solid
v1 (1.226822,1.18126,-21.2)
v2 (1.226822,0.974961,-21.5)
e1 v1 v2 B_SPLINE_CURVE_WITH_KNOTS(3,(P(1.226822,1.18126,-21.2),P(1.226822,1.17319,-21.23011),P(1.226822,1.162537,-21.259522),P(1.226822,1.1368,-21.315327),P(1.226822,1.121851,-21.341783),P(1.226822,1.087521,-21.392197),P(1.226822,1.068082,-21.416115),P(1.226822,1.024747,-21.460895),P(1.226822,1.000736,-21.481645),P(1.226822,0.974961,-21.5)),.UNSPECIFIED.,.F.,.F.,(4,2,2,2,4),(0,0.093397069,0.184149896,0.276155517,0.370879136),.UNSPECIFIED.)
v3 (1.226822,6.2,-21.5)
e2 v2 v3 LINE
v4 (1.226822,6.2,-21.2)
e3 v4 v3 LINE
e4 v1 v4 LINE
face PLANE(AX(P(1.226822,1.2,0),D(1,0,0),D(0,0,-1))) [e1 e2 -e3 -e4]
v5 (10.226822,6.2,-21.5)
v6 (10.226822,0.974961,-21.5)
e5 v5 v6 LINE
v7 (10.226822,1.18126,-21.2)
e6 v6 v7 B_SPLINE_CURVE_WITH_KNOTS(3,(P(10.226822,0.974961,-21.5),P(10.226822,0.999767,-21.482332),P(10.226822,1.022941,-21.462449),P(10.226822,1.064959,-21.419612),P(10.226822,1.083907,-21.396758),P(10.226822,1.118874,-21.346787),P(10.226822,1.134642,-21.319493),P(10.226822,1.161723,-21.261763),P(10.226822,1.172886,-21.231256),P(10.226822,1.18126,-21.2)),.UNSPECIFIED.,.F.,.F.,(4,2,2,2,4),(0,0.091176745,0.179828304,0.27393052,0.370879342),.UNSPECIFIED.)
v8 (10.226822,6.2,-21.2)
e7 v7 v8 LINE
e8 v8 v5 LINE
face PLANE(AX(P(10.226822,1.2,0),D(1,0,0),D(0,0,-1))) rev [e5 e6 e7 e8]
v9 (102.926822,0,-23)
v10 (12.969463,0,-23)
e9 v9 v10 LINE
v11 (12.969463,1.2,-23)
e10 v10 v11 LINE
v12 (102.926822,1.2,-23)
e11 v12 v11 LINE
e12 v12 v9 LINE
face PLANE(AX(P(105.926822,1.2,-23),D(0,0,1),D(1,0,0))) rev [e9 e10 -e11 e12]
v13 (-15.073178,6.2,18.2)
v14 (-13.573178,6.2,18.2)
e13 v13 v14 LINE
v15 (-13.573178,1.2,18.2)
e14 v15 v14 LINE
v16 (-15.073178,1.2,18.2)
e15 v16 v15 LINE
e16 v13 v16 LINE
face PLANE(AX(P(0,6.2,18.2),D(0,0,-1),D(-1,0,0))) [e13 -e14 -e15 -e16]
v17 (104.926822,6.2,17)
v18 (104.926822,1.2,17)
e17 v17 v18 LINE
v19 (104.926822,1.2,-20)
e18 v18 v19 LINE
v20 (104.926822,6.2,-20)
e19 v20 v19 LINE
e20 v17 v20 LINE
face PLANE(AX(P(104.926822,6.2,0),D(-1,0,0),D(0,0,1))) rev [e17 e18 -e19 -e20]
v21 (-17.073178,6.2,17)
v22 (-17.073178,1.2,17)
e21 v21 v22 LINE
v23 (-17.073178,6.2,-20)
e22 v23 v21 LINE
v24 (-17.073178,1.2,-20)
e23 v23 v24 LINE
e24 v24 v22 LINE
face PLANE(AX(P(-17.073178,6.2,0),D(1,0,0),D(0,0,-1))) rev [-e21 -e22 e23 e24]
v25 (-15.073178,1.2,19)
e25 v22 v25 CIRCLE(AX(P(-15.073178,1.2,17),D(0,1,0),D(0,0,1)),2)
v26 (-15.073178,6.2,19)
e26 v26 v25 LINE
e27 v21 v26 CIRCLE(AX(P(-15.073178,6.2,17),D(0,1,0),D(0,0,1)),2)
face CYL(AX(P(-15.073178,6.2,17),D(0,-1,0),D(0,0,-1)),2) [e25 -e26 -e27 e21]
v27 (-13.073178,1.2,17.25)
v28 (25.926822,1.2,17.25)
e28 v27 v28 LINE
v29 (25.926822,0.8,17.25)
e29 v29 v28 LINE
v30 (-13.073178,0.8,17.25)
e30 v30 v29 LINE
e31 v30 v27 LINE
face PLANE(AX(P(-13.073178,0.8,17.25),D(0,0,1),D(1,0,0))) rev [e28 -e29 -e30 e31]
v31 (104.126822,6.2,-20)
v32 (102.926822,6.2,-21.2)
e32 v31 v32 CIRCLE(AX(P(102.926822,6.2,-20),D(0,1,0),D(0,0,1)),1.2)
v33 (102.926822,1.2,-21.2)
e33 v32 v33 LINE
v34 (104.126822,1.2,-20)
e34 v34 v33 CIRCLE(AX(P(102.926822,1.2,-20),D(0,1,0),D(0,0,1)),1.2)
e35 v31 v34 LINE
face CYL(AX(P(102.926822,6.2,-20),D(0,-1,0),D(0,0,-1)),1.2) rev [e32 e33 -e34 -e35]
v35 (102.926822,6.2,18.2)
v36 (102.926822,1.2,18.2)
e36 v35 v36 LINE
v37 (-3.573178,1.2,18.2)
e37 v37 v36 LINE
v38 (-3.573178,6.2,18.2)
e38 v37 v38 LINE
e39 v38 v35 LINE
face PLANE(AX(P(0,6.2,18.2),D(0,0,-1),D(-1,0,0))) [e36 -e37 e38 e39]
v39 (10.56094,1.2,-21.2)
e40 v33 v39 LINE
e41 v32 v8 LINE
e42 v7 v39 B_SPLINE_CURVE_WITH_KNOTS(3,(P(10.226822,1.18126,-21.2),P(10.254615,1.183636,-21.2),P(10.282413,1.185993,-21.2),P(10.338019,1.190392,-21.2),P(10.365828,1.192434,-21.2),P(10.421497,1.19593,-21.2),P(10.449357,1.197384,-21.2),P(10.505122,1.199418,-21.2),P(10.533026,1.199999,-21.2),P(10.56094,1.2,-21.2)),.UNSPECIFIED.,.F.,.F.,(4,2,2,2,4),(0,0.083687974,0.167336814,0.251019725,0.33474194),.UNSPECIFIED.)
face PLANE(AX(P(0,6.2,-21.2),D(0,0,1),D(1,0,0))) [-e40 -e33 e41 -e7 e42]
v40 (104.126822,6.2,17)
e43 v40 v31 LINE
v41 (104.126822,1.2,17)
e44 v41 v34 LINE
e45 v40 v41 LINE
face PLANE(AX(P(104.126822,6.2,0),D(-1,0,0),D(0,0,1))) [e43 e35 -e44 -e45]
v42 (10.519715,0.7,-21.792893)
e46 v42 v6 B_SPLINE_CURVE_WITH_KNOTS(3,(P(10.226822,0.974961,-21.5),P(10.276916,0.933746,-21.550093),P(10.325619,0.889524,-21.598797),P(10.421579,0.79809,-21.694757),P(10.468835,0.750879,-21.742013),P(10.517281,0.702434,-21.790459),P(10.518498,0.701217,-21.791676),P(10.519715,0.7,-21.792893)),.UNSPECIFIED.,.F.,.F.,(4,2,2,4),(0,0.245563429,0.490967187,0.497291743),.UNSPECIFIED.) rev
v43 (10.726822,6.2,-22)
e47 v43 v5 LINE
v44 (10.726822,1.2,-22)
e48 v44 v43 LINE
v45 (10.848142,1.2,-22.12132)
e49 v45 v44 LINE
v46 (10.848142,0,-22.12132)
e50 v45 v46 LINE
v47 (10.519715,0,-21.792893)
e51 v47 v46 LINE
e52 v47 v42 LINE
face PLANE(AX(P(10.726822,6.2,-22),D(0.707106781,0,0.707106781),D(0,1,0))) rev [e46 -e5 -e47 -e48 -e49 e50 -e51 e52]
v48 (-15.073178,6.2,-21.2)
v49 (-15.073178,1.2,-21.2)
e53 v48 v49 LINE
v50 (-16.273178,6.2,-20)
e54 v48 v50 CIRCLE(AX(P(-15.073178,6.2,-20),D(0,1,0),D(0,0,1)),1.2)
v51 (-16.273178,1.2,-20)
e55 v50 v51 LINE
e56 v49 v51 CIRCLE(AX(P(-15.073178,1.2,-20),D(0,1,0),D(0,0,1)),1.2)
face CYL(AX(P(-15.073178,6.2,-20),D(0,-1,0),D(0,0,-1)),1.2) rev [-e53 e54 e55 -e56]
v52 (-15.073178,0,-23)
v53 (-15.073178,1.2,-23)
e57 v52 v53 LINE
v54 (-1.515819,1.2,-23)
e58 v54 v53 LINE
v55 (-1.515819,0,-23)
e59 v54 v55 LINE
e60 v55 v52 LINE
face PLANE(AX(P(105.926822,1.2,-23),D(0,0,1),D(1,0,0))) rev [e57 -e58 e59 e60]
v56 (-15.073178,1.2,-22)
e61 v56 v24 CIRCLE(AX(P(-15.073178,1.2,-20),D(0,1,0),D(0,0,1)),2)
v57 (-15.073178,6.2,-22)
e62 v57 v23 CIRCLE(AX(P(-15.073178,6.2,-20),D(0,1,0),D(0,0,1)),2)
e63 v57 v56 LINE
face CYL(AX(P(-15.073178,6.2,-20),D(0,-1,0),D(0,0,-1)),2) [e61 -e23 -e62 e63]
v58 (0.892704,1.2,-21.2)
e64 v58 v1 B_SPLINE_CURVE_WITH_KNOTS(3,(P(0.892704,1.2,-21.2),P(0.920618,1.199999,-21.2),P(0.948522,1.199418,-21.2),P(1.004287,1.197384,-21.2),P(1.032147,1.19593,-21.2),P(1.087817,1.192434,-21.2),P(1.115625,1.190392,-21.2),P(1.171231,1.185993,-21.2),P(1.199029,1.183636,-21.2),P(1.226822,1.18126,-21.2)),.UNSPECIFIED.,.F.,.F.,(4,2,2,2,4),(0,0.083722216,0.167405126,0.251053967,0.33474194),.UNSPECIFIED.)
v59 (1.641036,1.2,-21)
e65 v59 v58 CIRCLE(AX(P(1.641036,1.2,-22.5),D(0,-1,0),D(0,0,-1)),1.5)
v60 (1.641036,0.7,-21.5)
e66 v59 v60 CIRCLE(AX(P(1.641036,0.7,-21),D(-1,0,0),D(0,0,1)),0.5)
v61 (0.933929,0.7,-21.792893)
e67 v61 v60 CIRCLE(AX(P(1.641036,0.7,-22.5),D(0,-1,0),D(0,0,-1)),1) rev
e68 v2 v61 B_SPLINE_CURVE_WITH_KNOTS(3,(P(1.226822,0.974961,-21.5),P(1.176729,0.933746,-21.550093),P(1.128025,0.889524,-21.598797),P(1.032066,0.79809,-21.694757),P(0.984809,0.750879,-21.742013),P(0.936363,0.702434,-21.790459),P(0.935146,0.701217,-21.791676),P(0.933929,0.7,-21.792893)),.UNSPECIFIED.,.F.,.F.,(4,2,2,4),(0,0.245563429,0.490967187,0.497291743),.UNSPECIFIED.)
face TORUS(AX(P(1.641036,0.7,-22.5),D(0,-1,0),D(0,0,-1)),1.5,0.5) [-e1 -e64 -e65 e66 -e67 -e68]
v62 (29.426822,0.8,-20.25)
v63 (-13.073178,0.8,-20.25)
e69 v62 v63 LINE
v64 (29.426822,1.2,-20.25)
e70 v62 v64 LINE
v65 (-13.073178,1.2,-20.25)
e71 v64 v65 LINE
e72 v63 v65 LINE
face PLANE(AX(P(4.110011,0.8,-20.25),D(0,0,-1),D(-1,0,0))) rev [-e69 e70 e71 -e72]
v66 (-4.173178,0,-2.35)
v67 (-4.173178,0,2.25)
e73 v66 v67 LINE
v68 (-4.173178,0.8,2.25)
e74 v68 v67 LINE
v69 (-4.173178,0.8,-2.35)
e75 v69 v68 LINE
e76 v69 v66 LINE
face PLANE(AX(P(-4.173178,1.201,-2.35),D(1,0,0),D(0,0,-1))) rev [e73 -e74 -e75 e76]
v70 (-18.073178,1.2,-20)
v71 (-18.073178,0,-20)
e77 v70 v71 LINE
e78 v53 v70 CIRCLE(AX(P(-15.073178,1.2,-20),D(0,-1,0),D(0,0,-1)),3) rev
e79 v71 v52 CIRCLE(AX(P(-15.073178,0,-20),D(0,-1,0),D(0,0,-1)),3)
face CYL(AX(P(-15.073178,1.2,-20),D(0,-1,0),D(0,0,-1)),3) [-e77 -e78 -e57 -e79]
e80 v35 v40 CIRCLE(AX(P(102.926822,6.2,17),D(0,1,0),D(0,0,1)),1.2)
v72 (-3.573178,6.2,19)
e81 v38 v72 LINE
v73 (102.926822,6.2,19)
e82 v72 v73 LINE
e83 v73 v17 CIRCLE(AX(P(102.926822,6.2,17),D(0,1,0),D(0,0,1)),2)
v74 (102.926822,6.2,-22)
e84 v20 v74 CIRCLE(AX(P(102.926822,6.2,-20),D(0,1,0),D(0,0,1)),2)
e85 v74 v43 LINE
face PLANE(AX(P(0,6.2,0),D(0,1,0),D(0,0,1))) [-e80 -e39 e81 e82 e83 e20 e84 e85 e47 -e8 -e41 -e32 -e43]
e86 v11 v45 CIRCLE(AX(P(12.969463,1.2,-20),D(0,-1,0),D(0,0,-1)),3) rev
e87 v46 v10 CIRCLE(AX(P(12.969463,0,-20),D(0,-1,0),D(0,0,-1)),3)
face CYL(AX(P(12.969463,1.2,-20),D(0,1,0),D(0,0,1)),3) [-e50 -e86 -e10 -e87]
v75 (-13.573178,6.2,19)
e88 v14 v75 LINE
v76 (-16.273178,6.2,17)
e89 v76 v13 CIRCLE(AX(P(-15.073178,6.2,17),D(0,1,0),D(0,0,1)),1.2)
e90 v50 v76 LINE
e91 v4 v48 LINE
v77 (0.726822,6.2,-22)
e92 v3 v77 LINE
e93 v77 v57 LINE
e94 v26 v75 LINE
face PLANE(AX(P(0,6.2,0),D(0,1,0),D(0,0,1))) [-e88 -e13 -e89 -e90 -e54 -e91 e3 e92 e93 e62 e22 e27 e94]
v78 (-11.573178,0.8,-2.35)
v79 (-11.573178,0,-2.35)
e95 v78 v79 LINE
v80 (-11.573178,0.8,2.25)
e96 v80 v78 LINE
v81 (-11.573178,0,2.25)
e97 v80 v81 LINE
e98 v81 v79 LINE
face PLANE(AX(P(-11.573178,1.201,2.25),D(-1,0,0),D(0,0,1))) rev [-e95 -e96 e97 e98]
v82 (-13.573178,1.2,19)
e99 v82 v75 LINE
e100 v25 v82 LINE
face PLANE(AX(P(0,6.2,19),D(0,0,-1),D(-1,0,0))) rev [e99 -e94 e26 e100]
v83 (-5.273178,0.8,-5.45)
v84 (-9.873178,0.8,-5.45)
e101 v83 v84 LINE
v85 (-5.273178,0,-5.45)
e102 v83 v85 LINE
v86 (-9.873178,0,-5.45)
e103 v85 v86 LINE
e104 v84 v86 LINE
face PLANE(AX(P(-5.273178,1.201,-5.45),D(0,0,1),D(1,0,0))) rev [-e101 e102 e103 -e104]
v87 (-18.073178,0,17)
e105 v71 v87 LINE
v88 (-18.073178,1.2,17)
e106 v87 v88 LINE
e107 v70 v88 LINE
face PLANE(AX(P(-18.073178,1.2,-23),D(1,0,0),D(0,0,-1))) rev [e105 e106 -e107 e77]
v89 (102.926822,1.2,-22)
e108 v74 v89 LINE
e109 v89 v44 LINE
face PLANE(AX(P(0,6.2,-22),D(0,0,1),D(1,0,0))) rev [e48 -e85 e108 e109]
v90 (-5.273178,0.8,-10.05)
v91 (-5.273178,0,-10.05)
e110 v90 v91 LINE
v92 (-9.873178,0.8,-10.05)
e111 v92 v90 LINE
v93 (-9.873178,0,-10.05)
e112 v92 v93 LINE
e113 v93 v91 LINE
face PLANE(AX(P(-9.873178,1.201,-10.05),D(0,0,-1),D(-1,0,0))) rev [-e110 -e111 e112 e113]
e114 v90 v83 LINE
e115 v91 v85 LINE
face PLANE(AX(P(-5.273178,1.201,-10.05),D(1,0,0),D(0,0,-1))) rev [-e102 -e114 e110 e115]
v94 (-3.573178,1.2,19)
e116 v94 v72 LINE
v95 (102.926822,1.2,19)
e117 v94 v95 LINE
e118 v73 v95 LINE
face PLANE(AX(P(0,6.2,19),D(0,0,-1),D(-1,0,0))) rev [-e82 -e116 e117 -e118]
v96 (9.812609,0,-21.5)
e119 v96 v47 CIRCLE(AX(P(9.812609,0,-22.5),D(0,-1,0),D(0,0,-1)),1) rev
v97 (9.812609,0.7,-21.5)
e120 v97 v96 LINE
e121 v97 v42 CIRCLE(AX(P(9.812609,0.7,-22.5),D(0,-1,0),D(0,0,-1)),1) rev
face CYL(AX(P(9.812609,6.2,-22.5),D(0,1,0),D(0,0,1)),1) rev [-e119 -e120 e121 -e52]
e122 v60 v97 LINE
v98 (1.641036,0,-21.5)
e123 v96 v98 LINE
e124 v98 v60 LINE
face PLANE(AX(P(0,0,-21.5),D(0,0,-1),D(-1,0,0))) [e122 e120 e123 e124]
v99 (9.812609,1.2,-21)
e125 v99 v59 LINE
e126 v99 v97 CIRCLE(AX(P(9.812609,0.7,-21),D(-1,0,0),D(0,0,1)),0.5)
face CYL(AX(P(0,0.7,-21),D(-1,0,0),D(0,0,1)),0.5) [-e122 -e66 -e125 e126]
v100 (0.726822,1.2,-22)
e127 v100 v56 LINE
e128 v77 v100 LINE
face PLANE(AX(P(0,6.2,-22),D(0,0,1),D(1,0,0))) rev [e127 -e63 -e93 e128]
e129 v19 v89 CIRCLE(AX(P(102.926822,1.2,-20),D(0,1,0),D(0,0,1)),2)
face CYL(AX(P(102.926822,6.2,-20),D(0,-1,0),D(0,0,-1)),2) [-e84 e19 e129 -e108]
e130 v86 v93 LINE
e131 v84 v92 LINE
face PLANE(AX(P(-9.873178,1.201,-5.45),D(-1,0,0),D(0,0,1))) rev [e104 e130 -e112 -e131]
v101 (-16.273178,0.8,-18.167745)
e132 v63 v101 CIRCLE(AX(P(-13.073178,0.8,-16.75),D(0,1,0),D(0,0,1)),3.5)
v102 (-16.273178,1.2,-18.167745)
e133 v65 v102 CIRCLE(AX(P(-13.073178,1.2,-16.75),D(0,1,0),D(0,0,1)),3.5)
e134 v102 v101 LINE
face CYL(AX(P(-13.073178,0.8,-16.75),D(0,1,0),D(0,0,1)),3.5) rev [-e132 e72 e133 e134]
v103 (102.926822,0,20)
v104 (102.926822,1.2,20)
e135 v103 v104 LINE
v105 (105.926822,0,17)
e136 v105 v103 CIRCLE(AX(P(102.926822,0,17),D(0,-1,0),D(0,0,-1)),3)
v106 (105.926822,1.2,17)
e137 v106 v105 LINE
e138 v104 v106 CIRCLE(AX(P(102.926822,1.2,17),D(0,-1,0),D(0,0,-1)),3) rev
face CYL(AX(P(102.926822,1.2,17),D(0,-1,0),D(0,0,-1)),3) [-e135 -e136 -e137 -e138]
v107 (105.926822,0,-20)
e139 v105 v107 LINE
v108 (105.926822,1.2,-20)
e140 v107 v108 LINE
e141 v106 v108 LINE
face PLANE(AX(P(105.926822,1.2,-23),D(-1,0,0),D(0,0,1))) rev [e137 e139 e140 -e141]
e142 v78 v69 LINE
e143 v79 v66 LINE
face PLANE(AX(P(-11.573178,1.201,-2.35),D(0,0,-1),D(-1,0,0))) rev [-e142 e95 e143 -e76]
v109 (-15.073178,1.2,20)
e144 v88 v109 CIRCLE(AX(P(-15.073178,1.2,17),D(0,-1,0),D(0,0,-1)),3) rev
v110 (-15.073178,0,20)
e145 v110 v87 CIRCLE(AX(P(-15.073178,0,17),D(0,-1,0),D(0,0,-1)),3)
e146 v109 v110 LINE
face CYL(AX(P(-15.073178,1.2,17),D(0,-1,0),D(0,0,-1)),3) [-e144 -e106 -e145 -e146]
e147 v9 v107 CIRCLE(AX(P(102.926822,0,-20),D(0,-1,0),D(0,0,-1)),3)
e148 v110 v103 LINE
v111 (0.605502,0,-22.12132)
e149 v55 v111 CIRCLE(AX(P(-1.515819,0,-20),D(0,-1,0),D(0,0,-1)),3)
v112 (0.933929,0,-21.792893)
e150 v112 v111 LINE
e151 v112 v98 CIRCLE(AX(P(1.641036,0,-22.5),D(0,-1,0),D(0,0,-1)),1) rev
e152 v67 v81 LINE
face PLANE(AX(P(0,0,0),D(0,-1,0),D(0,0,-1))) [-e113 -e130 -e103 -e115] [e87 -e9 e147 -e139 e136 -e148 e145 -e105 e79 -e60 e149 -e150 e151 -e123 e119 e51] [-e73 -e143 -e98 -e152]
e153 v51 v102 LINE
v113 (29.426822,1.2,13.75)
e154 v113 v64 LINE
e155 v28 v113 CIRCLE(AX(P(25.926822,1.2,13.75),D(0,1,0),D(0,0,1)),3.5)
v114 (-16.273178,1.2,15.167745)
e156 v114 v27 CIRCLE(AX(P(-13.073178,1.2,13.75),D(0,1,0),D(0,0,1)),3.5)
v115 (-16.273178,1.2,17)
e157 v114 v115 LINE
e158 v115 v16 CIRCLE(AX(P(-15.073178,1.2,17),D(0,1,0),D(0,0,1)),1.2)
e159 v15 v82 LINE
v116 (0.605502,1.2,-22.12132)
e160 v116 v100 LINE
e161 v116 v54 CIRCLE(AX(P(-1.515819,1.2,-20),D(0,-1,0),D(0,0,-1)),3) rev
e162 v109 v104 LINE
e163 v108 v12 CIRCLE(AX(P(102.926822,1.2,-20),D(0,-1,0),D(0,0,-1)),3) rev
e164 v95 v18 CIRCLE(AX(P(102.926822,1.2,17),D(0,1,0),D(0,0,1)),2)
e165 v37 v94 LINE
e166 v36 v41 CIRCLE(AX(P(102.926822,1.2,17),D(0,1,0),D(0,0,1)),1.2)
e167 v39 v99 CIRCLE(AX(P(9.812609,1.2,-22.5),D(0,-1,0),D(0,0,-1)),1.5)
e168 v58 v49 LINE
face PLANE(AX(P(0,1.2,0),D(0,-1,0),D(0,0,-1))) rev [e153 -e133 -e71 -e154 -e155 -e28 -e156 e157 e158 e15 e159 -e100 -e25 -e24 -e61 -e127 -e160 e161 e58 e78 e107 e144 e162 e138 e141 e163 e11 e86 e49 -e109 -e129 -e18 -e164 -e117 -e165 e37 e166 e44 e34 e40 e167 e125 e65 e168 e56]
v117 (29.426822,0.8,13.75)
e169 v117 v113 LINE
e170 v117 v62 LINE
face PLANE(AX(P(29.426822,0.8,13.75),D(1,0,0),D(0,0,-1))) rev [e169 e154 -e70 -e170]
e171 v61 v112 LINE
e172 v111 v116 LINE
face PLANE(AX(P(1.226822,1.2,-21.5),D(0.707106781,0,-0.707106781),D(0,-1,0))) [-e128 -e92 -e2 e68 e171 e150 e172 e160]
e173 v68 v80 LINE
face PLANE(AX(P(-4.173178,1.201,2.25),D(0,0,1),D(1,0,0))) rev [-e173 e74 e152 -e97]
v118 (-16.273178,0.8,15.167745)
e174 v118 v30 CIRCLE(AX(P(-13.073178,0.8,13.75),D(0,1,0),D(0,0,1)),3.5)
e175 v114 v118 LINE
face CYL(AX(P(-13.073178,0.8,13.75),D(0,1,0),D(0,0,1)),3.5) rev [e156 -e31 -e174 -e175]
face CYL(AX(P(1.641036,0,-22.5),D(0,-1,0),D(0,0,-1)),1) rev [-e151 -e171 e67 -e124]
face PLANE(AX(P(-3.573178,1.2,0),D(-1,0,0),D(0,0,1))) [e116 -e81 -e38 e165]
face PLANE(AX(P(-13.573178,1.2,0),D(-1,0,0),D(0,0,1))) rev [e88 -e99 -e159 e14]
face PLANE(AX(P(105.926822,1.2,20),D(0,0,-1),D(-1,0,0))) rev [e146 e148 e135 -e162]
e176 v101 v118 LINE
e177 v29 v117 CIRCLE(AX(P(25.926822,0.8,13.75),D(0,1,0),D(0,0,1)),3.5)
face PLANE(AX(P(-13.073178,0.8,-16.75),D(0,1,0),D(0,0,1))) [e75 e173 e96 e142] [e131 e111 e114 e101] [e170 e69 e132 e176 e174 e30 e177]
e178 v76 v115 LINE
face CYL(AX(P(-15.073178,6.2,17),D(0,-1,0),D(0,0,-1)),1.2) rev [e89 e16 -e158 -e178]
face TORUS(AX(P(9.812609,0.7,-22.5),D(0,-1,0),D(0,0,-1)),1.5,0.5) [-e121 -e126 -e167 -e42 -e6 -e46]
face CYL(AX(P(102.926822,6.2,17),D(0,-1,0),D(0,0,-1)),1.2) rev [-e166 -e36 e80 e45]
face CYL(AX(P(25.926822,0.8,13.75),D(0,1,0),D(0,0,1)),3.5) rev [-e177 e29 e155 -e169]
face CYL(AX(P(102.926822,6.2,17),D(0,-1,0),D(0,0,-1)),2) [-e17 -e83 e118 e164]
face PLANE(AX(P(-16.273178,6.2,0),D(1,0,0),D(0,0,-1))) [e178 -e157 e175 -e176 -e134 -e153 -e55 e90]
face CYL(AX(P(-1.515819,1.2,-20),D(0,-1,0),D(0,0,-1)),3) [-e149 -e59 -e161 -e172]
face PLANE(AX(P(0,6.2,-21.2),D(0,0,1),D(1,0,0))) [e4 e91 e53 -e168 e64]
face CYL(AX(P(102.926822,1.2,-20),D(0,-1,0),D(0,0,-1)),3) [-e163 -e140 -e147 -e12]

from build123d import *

# Parameters (mm, degrees)
SKETCH_1_W               = 124
SKETCH_1_H               = 43
EXTRUDE_1_DEPTH          = 1.2
CUT_EXTRUDE_1_REACH      = 110.402
SKETCH_3_W               = 7.4
SKETCH_3_H               = 4.6
SKETCH_3_W_2             = 4.6
CUT_EXTRUDE_2_DEPTH      = 0.4
FILLET_1_R               = 3
EXTRUDE_START            = 5
EXTRUDE_5_DEPTH          = 5
SKETCH_7_W               = 0.8
SKETCH_7_H               = 5.4
EXTRUDE_6_DEPTH          = 33.335489
SKETCH_8_W               = 4.5
SKETCH_8_H               = 0.8
CUT_EXTRUDE_3_DEPTH      = 5
CHAMFER_2_SIZE           = 0.5
CUT_EXTRUDE_5_DEPTH      = 109.510329697
CUT_EXTRUDE_5_DEPTH_BACK = 109.510329697
FILLET_2_R               = 3
FILLET_3_R               = 1
FILLET_4_R               = 0.5
SKETCH_10_W              = 10
SKETCH_10_H              = 0.8
CUT_EXTRUDE_6_DEPTH      = 5


with BuildPart() as part:
    # Эскиз1 → Бобышка-Вытянуть1 (new body)
    with BuildSketch(Plane(origin=(0, 0, 0), x_dir=(1, 0, 0), z_dir=(0, 1, 0))):
        with Locations((43.92682215, 1.5)):
            Rectangle(SKETCH_1_W, SKETCH_1_H)
    extrude(amount=EXTRUDE_1_DEPTH)

    # Эскиз3 → Вырез-Вытянуть1 (cut, up to next)
    with BuildSketch(Plane.XZ, mode=Mode.PRIVATE) as cut_extrude_1_sk1:
        with Locations((-7.87317785, -0.05)):
            Rectangle(SKETCH_3_W, SKETCH_3_H)
    cut_extrude_1_tool1 = extrude(cut_extrude_1_sk1.sketch, amount=-CUT_EXTRUDE_1_REACH, mode=Mode.PRIVATE) & part.part
    # Эскиз3 → Вырез-Вытянуть1 (cut, up to next)
    with BuildSketch(Plane.XZ, mode=Mode.PRIVATE) as cut_extrude_1_sk2:
        with Locations((-7.57317785, -7.75)):
            Rectangle(SKETCH_3_W_2, SKETCH_3_H)
    cut_extrude_1_tool2 = extrude(cut_extrude_1_sk2.sketch, amount=-CUT_EXTRUDE_1_REACH, mode=Mode.PRIVATE) & part.part
    add(cut_extrude_1_tool1.solids().sort_by_distance((-7.873178, 0, -0.05))[0], mode=Mode.SUBTRACT)
    add(cut_extrude_1_tool2.solids().sort_by_distance((-7.573178, 0, -7.75))[0], mode=Mode.SUBTRACT)

    # Эскиз4 → Вырез-Вытянуть2 (cut)
    with BuildSketch(Plane(origin=(0, 1.2, 0), x_dir=(1, 0, 0), z_dir=(0, 1, 0))):
        with BuildLine():
            Line((4.110011464, 20.25), (7.343632837, 20.25))
            Line((7.343632837, 20.25), (29.42682215, 20.25))
            Line((29.42682215, 20.25), (29.42682215, -13.75))
            ThreePointArc((29.42682215, -13.75), (28.401695885, -16.224873734), (25.92682215, -17.25))
            Line((25.92682215, -17.25), (-13.07317785, -17.25))
            ThreePointArc((-13.07317785, -17.25), (-15.548051584, -16.224873734), (-16.57317785, -13.75))
            Line((-16.57317785, -13.75), (-16.57317785, 16.75))
            ThreePointArc((-16.57317785, 16.75), (-15.548051584, 19.224873734), (-13.07317785, 20.25))
            Line((-13.07317785, 20.25), (4.110011464, 20.25))
        make_face()
    extrude(amount=-CUT_EXTRUDE_2_DEPTH, mode=Mode.SUBTRACT)

    # Скругление1
    fillet_1_edges = [part.edges().sort_by_distance(p)[0] for p in [
        (-18.07317785, 0.6, -23),
        (105.92682215, 0.6, -23),
        (105.92682215, 0.6, 20),
        (-18.07317785, 0.6, 20),
    ]]
    fillet(fillet_1_edges, radius=FILLET_1_R)

    # Эскиз5 → Бобышка-Вытянуть5 (add)
    with BuildSketch(Plane(origin=(0, 1.2, 0), x_dir=(1, 0, 0), z_dir=(0, 1, 0)).offset(EXTRUDE_START)):
        with BuildLine():
            ThreePointArc((102.92682215, -19), (104.341035713, -18.414213562), (104.92682215, -17))
            Line((104.92682215, -17), (104.92682215, 20))
            ThreePointArc((104.92682215, 20), (104.341035713, 21.414213562), (102.92682215, 22))
            Line((102.92682215, 22), (-15.07317785, 22))
            ThreePointArc((-15.07317785, 22), (-16.487391412, 21.414213562), (-17.07317785, 20))
            Line((-17.07317785, 20), (-17.07317785, -17))
            ThreePointArc((-17.07317785, -17), (-16.487391412, -18.414213562), (-15.07317785, -19))
            Line((-15.07317785, -19), (102.92682215, -19))
        make_face()
        with BuildLine():
            Line((102.92682215, -18.2), (-15.07317785, -18.2))
            ThreePointArc((-15.07317785, -18.2), (-15.921705987, -17.848528137), (-16.27317785, -17))
            Line((-16.27317785, -17), (-16.27317785, -15.167744688))
            ThreePointArc((-16.27317785, -15.167744688), (-16.497356583, -14.474568837), (-16.57317785, -13.75))
            Line((-16.57317785, -13.75), (-16.57317785, 16.75))
            ThreePointArc((-16.57317785, 16.75), (-16.497356583, 17.474568837), (-16.27317785, 18.167744688))
            Line((-16.27317785, 18.167744688), (-16.27317785, 20))
            ThreePointArc((-16.27317785, 20), (-15.921705987, 20.848528137), (-15.07317785, 21.2))
            Line((-15.07317785, 21.2), (102.92682215, 21.2))
            ThreePointArc((102.92682215, 21.2), (103.775350288, 20.848528137), (104.12682215, 20))
            Line((104.12682215, 20), (104.12682215, -17))
            ThreePointArc((104.12682215, -17), (103.775350288, -17.848528137), (102.92682215, -18.2))
        make_face(mode=Mode.SUBTRACT)
    extrude(amount=-EXTRUDE_5_DEPTH)

    # Эскиз7 → Бобышка-Вытянуть6 (add)
    with BuildSketch(Plane(origin=(0, 0, 15.167744688), x_dir=(-1, 0, 0), z_dir=(0, 0, -1))):
        with Locations((16.67317785, 3.5)):
            Rectangle(SKETCH_7_W, SKETCH_7_H)
    extrude(amount=EXTRUDE_6_DEPTH)

    # Эскиз8 → Вырез-Вытянуть3 (cut)
    with BuildSketch(Plane(origin=(0, 6.2, 0), x_dir=(1, 0, 0), z_dir=(0, 1, 0))):
        with Locations((7.97682215, 21.6)):
            Rectangle(SKETCH_8_W, SKETCH_8_H)
        with Locations((3.47682215, 21.6)):
            Rectangle(SKETCH_8_W, SKETCH_8_H)
    extrude(amount=-CUT_EXTRUDE_3_DEPTH, mode=Mode.SUBTRACT)

    # Фаска2
    chamfer_2_edges = [part.edges().sort_by_distance(p)[0] for p in [
        (1.22682215, 3.7, -22),
        (10.22682215, 3.7, -22),
    ]]
    chamfer(chamfer_2_edges, length=CHAMFER_2_SIZE)

    # Эскиз9 → Вырез-Вытянуть5 (cut, two sides: drawn at the far end of the back side and taken through both)
    with BuildSketch(Plane(origin=(0, 1.2, 0), x_dir=(1, 0, 0), z_dir=(0, 1, 0)).offset(-CUT_EXTRUDE_5_DEPTH_BACK)):
        Polygon((1.22682215, 21.5), (10.22682215, 21.5), (10.72682215, 22), (11.72682215, 23), (-0.27317785, 23), (0.72682215, 22), align=None)
    extrude(amount=CUT_EXTRUDE_5_DEPTH + CUT_EXTRUDE_5_DEPTH_BACK, mode=Mode.SUBTRACT)

    # Скругление2
    fillet_2_edges = [part.edges().sort_by_distance(p)[0] for p in [
        (-0.27317785, 0.6, -23),
        (11.72682215, 0.6, -23),
    ]]
    fillet(fillet_2_edges, radius=FILLET_2_R)

    # Скругление3
    fillet_3_edges = [part.edges().sort_by_distance(p)[0] for p in [
        (1.22682215, 0.6, -21.5),
        (10.22682215, 0.6, -21.5),
    ]]
    fillet(fillet_3_edges, radius=FILLET_3_R)

    # Скругление4
    # the kernel refuses this fillet: 0.5 mm, written as the material it takes off along each edge
    with BuildSketch(Plane(origin=(9.812608588, 1.2, -21.5), x_dir=(0, 0, 1), z_dir=(-1, 0, 0))) as fillet_4_piece_1:
        with BuildLine():
            CenterArc((FILLET_4_R, -FILLET_4_R), FILLET_4_R, 90, 90)
            Line((0, -FILLET_4_R), (0, 0))
            Line((0, 0), (FILLET_4_R, 0))
        make_face()
    extrude(amount=8.171572875, mode=Mode.SUBTRACT)
    with BuildSketch(Plane(origin=(1.641035713, 1.2, -22.5), x_dir=(-0.8939437975787546, 0, -0.448179078907611), z_dir=(0.448179078907611, 0, -0.8939437975787546))) as fillet_4_piece_2_section:
        with BuildLine():
            CenterArc((1 + FILLET_4_R, -FILLET_4_R), FILLET_4_R, 90, 90)
            Line((1, -FILLET_4_R), (1, 0))
            Line((1, 0), (1 + FILLET_4_R, 0))
        make_face()
    fillet_4_piece_2 = revolve(axis=Axis((1.641035713, 1.2, -22.5), (0, 1, 0)), revolution_arc=116.626915432, mode=Mode.PRIVATE)
    fillet_4_piece_2 = split(fillet_4_piece_2, bisect_by=Plane(origin=(1.130412309, 1.014643197, -21.596409841), z_dir=(0.7071067811865498, 0, -0.7071067811865454)), keep=Keep.TOP, mode=Mode.PRIVATE)
    add(fillet_4_piece_2, mode=Mode.SUBTRACT)
    with BuildSketch(Plane(origin=(1.641035713, 1.2, -22.5), x_dir=(-0.8939437975787546, 0, -0.448179078907611), z_dir=(0.448179078907611, 0, -0.8939437975787546))) as fillet_4_piece_3_section:
        with BuildLine():
            CenterArc((1 + FILLET_4_R, -FILLET_4_R), FILLET_4_R, 90, 90)
            Line((1, -FILLET_4_R), (1, 0))
            Line((1, 0), (1 + FILLET_4_R, 0))
        make_face()
    fillet_4_piece_3 = revolve(axis=Axis((1.641035713, 1.2, -22.5), (0, 1, 0)), revolution_arc=116.626915432, mode=Mode.PRIVATE)
    fillet_4_piece_3 = split(fillet_4_piece_3, bisect_by=Plane(origin=(1.22682215, 1.150324025, -21.336464166), z_dir=(1, 0, 0)), keep=Keep.TOP, mode=Mode.PRIVATE)
    add(fillet_4_piece_3, mode=Mode.SUBTRACT)
    with BuildSketch(Plane(origin=(1.641035713, 1.2, -22.5), x_dir=(-0.8939437975787546, 0, -0.448179078907611), z_dir=(0.448179078907611, 0, -0.8939437975787546))) as fillet_4_piece_4_section:
        with BuildLine():
            CenterArc((1 + FILLET_4_R, -FILLET_4_R), FILLET_4_R, 90, 90)
            Line((1, -FILLET_4_R), (1, 0))
            Line((1, 0), (1 + FILLET_4_R, 0))
        make_face()
    fillet_4_piece_4 = revolve(axis=Axis((1.641035713, 1.2, -22.5), (0, 1, 0)), revolution_arc=116.626915432, mode=Mode.PRIVATE)
    fillet_4_piece_4 = split(fillet_4_piece_4, bisect_by=Plane(origin=(1.152970199, 1.196161592, -21.2), z_dir=(0, 0, 1)), keep=Keep.TOP, mode=Mode.PRIVATE)
    add(fillet_4_piece_4, mode=Mode.SUBTRACT)
    with BuildSketch(Plane(origin=(9.812608588, 1.2, -22.5), x_dir=(0.8939437975787601, 0, -0.4481790789075999), z_dir=(-0.4481790789075999, 0, -0.8939437975787601))) as fillet_4_piece_5_section:
        with BuildLine():
            CenterArc((1 + FILLET_4_R, FILLET_4_R), FILLET_4_R, 180, 90)
            Line((1 + FILLET_4_R, 0), (1, 0))
            Line((1, 0), (1, FILLET_4_R))
        make_face()
    fillet_4_piece_5 = revolve(axis=Axis((9.812608588, 1.2, -22.5), (0, -1, 0)), revolution_arc=116.626915432, mode=Mode.PRIVATE)
    fillet_4_piece_5 = split(fillet_4_piece_5, bisect_by=Plane(origin=(10.323231991, 1.014642922, -21.59640984), z_dir=(-0.7071067811865426, 0, -0.7071067811865526)), keep=Keep.TOP, mode=Mode.PRIVATE)
    add(fillet_4_piece_5, mode=Mode.SUBTRACT)
    with BuildSketch(Plane(origin=(9.812608588, 1.2, -22.5), x_dir=(0.8939437975787601, 0, -0.4481790789075999), z_dir=(-0.4481790789075999, 0, -0.8939437975787601))) as fillet_4_piece_6_section:
        with BuildLine():
            CenterArc((1 + FILLET_4_R, FILLET_4_R), FILLET_4_R, 180, 90)
            Line((1 + FILLET_4_R, 0), (1, 0))
            Line((1, 0), (1, FILLET_4_R))
        make_face()
    fillet_4_piece_6 = revolve(axis=Axis((9.812608588, 1.2, -22.5), (0, -1, 0)), revolution_arc=116.626915432, mode=Mode.PRIVATE)
    fillet_4_piece_6 = split(fillet_4_piece_6, bisect_by=Plane(origin=(10.22682215, 1.150324024, -21.336464168), z_dir=(-1, 0, 0)), keep=Keep.TOP, mode=Mode.PRIVATE)
    add(fillet_4_piece_6, mode=Mode.SUBTRACT)
    with BuildSketch(Plane(origin=(9.812608588, 1.2, -22.5), x_dir=(0.8939437975787601, 0, -0.4481790789075999), z_dir=(-0.4481790789075999, 0, -0.8939437975787601))) as fillet_4_piece_7_section:
        with BuildLine():
            CenterArc((1 + FILLET_4_R, FILLET_4_R), FILLET_4_R, 180, 90)
            Line((1 + FILLET_4_R, 0), (1, 0))
            Line((1, 0), (1, FILLET_4_R))
        make_face()
    fillet_4_piece_7 = revolve(axis=Axis((9.812608588, 1.2, -22.5), (0, -1, 0)), revolution_arc=116.626915432, mode=Mode.PRIVATE)
    fillet_4_piece_7 = split(fillet_4_piece_7, bisect_by=Plane(origin=(10.300674101, 1.196161592, -21.2), z_dir=(0, 0, 1)), keep=Keep.TOP, mode=Mode.PRIVATE)
    add(fillet_4_piece_7, mode=Mode.SUBTRACT)

    # Эскиз10 → Вырез-Вытянуть6 (cut)
    with BuildSketch(Plane(origin=(0, 6.2, 0), x_dir=(1, 0, 0), z_dir=(0, 1, 0))):
        with Locations((-8.57317785, -18.6)):
            Rectangle(SKETCH_10_W, SKETCH_10_H)
    extrude(amount=-CUT_EXTRUDE_6_DEPTH, mode=Mode.SUBTRACT)


solid = part.part
